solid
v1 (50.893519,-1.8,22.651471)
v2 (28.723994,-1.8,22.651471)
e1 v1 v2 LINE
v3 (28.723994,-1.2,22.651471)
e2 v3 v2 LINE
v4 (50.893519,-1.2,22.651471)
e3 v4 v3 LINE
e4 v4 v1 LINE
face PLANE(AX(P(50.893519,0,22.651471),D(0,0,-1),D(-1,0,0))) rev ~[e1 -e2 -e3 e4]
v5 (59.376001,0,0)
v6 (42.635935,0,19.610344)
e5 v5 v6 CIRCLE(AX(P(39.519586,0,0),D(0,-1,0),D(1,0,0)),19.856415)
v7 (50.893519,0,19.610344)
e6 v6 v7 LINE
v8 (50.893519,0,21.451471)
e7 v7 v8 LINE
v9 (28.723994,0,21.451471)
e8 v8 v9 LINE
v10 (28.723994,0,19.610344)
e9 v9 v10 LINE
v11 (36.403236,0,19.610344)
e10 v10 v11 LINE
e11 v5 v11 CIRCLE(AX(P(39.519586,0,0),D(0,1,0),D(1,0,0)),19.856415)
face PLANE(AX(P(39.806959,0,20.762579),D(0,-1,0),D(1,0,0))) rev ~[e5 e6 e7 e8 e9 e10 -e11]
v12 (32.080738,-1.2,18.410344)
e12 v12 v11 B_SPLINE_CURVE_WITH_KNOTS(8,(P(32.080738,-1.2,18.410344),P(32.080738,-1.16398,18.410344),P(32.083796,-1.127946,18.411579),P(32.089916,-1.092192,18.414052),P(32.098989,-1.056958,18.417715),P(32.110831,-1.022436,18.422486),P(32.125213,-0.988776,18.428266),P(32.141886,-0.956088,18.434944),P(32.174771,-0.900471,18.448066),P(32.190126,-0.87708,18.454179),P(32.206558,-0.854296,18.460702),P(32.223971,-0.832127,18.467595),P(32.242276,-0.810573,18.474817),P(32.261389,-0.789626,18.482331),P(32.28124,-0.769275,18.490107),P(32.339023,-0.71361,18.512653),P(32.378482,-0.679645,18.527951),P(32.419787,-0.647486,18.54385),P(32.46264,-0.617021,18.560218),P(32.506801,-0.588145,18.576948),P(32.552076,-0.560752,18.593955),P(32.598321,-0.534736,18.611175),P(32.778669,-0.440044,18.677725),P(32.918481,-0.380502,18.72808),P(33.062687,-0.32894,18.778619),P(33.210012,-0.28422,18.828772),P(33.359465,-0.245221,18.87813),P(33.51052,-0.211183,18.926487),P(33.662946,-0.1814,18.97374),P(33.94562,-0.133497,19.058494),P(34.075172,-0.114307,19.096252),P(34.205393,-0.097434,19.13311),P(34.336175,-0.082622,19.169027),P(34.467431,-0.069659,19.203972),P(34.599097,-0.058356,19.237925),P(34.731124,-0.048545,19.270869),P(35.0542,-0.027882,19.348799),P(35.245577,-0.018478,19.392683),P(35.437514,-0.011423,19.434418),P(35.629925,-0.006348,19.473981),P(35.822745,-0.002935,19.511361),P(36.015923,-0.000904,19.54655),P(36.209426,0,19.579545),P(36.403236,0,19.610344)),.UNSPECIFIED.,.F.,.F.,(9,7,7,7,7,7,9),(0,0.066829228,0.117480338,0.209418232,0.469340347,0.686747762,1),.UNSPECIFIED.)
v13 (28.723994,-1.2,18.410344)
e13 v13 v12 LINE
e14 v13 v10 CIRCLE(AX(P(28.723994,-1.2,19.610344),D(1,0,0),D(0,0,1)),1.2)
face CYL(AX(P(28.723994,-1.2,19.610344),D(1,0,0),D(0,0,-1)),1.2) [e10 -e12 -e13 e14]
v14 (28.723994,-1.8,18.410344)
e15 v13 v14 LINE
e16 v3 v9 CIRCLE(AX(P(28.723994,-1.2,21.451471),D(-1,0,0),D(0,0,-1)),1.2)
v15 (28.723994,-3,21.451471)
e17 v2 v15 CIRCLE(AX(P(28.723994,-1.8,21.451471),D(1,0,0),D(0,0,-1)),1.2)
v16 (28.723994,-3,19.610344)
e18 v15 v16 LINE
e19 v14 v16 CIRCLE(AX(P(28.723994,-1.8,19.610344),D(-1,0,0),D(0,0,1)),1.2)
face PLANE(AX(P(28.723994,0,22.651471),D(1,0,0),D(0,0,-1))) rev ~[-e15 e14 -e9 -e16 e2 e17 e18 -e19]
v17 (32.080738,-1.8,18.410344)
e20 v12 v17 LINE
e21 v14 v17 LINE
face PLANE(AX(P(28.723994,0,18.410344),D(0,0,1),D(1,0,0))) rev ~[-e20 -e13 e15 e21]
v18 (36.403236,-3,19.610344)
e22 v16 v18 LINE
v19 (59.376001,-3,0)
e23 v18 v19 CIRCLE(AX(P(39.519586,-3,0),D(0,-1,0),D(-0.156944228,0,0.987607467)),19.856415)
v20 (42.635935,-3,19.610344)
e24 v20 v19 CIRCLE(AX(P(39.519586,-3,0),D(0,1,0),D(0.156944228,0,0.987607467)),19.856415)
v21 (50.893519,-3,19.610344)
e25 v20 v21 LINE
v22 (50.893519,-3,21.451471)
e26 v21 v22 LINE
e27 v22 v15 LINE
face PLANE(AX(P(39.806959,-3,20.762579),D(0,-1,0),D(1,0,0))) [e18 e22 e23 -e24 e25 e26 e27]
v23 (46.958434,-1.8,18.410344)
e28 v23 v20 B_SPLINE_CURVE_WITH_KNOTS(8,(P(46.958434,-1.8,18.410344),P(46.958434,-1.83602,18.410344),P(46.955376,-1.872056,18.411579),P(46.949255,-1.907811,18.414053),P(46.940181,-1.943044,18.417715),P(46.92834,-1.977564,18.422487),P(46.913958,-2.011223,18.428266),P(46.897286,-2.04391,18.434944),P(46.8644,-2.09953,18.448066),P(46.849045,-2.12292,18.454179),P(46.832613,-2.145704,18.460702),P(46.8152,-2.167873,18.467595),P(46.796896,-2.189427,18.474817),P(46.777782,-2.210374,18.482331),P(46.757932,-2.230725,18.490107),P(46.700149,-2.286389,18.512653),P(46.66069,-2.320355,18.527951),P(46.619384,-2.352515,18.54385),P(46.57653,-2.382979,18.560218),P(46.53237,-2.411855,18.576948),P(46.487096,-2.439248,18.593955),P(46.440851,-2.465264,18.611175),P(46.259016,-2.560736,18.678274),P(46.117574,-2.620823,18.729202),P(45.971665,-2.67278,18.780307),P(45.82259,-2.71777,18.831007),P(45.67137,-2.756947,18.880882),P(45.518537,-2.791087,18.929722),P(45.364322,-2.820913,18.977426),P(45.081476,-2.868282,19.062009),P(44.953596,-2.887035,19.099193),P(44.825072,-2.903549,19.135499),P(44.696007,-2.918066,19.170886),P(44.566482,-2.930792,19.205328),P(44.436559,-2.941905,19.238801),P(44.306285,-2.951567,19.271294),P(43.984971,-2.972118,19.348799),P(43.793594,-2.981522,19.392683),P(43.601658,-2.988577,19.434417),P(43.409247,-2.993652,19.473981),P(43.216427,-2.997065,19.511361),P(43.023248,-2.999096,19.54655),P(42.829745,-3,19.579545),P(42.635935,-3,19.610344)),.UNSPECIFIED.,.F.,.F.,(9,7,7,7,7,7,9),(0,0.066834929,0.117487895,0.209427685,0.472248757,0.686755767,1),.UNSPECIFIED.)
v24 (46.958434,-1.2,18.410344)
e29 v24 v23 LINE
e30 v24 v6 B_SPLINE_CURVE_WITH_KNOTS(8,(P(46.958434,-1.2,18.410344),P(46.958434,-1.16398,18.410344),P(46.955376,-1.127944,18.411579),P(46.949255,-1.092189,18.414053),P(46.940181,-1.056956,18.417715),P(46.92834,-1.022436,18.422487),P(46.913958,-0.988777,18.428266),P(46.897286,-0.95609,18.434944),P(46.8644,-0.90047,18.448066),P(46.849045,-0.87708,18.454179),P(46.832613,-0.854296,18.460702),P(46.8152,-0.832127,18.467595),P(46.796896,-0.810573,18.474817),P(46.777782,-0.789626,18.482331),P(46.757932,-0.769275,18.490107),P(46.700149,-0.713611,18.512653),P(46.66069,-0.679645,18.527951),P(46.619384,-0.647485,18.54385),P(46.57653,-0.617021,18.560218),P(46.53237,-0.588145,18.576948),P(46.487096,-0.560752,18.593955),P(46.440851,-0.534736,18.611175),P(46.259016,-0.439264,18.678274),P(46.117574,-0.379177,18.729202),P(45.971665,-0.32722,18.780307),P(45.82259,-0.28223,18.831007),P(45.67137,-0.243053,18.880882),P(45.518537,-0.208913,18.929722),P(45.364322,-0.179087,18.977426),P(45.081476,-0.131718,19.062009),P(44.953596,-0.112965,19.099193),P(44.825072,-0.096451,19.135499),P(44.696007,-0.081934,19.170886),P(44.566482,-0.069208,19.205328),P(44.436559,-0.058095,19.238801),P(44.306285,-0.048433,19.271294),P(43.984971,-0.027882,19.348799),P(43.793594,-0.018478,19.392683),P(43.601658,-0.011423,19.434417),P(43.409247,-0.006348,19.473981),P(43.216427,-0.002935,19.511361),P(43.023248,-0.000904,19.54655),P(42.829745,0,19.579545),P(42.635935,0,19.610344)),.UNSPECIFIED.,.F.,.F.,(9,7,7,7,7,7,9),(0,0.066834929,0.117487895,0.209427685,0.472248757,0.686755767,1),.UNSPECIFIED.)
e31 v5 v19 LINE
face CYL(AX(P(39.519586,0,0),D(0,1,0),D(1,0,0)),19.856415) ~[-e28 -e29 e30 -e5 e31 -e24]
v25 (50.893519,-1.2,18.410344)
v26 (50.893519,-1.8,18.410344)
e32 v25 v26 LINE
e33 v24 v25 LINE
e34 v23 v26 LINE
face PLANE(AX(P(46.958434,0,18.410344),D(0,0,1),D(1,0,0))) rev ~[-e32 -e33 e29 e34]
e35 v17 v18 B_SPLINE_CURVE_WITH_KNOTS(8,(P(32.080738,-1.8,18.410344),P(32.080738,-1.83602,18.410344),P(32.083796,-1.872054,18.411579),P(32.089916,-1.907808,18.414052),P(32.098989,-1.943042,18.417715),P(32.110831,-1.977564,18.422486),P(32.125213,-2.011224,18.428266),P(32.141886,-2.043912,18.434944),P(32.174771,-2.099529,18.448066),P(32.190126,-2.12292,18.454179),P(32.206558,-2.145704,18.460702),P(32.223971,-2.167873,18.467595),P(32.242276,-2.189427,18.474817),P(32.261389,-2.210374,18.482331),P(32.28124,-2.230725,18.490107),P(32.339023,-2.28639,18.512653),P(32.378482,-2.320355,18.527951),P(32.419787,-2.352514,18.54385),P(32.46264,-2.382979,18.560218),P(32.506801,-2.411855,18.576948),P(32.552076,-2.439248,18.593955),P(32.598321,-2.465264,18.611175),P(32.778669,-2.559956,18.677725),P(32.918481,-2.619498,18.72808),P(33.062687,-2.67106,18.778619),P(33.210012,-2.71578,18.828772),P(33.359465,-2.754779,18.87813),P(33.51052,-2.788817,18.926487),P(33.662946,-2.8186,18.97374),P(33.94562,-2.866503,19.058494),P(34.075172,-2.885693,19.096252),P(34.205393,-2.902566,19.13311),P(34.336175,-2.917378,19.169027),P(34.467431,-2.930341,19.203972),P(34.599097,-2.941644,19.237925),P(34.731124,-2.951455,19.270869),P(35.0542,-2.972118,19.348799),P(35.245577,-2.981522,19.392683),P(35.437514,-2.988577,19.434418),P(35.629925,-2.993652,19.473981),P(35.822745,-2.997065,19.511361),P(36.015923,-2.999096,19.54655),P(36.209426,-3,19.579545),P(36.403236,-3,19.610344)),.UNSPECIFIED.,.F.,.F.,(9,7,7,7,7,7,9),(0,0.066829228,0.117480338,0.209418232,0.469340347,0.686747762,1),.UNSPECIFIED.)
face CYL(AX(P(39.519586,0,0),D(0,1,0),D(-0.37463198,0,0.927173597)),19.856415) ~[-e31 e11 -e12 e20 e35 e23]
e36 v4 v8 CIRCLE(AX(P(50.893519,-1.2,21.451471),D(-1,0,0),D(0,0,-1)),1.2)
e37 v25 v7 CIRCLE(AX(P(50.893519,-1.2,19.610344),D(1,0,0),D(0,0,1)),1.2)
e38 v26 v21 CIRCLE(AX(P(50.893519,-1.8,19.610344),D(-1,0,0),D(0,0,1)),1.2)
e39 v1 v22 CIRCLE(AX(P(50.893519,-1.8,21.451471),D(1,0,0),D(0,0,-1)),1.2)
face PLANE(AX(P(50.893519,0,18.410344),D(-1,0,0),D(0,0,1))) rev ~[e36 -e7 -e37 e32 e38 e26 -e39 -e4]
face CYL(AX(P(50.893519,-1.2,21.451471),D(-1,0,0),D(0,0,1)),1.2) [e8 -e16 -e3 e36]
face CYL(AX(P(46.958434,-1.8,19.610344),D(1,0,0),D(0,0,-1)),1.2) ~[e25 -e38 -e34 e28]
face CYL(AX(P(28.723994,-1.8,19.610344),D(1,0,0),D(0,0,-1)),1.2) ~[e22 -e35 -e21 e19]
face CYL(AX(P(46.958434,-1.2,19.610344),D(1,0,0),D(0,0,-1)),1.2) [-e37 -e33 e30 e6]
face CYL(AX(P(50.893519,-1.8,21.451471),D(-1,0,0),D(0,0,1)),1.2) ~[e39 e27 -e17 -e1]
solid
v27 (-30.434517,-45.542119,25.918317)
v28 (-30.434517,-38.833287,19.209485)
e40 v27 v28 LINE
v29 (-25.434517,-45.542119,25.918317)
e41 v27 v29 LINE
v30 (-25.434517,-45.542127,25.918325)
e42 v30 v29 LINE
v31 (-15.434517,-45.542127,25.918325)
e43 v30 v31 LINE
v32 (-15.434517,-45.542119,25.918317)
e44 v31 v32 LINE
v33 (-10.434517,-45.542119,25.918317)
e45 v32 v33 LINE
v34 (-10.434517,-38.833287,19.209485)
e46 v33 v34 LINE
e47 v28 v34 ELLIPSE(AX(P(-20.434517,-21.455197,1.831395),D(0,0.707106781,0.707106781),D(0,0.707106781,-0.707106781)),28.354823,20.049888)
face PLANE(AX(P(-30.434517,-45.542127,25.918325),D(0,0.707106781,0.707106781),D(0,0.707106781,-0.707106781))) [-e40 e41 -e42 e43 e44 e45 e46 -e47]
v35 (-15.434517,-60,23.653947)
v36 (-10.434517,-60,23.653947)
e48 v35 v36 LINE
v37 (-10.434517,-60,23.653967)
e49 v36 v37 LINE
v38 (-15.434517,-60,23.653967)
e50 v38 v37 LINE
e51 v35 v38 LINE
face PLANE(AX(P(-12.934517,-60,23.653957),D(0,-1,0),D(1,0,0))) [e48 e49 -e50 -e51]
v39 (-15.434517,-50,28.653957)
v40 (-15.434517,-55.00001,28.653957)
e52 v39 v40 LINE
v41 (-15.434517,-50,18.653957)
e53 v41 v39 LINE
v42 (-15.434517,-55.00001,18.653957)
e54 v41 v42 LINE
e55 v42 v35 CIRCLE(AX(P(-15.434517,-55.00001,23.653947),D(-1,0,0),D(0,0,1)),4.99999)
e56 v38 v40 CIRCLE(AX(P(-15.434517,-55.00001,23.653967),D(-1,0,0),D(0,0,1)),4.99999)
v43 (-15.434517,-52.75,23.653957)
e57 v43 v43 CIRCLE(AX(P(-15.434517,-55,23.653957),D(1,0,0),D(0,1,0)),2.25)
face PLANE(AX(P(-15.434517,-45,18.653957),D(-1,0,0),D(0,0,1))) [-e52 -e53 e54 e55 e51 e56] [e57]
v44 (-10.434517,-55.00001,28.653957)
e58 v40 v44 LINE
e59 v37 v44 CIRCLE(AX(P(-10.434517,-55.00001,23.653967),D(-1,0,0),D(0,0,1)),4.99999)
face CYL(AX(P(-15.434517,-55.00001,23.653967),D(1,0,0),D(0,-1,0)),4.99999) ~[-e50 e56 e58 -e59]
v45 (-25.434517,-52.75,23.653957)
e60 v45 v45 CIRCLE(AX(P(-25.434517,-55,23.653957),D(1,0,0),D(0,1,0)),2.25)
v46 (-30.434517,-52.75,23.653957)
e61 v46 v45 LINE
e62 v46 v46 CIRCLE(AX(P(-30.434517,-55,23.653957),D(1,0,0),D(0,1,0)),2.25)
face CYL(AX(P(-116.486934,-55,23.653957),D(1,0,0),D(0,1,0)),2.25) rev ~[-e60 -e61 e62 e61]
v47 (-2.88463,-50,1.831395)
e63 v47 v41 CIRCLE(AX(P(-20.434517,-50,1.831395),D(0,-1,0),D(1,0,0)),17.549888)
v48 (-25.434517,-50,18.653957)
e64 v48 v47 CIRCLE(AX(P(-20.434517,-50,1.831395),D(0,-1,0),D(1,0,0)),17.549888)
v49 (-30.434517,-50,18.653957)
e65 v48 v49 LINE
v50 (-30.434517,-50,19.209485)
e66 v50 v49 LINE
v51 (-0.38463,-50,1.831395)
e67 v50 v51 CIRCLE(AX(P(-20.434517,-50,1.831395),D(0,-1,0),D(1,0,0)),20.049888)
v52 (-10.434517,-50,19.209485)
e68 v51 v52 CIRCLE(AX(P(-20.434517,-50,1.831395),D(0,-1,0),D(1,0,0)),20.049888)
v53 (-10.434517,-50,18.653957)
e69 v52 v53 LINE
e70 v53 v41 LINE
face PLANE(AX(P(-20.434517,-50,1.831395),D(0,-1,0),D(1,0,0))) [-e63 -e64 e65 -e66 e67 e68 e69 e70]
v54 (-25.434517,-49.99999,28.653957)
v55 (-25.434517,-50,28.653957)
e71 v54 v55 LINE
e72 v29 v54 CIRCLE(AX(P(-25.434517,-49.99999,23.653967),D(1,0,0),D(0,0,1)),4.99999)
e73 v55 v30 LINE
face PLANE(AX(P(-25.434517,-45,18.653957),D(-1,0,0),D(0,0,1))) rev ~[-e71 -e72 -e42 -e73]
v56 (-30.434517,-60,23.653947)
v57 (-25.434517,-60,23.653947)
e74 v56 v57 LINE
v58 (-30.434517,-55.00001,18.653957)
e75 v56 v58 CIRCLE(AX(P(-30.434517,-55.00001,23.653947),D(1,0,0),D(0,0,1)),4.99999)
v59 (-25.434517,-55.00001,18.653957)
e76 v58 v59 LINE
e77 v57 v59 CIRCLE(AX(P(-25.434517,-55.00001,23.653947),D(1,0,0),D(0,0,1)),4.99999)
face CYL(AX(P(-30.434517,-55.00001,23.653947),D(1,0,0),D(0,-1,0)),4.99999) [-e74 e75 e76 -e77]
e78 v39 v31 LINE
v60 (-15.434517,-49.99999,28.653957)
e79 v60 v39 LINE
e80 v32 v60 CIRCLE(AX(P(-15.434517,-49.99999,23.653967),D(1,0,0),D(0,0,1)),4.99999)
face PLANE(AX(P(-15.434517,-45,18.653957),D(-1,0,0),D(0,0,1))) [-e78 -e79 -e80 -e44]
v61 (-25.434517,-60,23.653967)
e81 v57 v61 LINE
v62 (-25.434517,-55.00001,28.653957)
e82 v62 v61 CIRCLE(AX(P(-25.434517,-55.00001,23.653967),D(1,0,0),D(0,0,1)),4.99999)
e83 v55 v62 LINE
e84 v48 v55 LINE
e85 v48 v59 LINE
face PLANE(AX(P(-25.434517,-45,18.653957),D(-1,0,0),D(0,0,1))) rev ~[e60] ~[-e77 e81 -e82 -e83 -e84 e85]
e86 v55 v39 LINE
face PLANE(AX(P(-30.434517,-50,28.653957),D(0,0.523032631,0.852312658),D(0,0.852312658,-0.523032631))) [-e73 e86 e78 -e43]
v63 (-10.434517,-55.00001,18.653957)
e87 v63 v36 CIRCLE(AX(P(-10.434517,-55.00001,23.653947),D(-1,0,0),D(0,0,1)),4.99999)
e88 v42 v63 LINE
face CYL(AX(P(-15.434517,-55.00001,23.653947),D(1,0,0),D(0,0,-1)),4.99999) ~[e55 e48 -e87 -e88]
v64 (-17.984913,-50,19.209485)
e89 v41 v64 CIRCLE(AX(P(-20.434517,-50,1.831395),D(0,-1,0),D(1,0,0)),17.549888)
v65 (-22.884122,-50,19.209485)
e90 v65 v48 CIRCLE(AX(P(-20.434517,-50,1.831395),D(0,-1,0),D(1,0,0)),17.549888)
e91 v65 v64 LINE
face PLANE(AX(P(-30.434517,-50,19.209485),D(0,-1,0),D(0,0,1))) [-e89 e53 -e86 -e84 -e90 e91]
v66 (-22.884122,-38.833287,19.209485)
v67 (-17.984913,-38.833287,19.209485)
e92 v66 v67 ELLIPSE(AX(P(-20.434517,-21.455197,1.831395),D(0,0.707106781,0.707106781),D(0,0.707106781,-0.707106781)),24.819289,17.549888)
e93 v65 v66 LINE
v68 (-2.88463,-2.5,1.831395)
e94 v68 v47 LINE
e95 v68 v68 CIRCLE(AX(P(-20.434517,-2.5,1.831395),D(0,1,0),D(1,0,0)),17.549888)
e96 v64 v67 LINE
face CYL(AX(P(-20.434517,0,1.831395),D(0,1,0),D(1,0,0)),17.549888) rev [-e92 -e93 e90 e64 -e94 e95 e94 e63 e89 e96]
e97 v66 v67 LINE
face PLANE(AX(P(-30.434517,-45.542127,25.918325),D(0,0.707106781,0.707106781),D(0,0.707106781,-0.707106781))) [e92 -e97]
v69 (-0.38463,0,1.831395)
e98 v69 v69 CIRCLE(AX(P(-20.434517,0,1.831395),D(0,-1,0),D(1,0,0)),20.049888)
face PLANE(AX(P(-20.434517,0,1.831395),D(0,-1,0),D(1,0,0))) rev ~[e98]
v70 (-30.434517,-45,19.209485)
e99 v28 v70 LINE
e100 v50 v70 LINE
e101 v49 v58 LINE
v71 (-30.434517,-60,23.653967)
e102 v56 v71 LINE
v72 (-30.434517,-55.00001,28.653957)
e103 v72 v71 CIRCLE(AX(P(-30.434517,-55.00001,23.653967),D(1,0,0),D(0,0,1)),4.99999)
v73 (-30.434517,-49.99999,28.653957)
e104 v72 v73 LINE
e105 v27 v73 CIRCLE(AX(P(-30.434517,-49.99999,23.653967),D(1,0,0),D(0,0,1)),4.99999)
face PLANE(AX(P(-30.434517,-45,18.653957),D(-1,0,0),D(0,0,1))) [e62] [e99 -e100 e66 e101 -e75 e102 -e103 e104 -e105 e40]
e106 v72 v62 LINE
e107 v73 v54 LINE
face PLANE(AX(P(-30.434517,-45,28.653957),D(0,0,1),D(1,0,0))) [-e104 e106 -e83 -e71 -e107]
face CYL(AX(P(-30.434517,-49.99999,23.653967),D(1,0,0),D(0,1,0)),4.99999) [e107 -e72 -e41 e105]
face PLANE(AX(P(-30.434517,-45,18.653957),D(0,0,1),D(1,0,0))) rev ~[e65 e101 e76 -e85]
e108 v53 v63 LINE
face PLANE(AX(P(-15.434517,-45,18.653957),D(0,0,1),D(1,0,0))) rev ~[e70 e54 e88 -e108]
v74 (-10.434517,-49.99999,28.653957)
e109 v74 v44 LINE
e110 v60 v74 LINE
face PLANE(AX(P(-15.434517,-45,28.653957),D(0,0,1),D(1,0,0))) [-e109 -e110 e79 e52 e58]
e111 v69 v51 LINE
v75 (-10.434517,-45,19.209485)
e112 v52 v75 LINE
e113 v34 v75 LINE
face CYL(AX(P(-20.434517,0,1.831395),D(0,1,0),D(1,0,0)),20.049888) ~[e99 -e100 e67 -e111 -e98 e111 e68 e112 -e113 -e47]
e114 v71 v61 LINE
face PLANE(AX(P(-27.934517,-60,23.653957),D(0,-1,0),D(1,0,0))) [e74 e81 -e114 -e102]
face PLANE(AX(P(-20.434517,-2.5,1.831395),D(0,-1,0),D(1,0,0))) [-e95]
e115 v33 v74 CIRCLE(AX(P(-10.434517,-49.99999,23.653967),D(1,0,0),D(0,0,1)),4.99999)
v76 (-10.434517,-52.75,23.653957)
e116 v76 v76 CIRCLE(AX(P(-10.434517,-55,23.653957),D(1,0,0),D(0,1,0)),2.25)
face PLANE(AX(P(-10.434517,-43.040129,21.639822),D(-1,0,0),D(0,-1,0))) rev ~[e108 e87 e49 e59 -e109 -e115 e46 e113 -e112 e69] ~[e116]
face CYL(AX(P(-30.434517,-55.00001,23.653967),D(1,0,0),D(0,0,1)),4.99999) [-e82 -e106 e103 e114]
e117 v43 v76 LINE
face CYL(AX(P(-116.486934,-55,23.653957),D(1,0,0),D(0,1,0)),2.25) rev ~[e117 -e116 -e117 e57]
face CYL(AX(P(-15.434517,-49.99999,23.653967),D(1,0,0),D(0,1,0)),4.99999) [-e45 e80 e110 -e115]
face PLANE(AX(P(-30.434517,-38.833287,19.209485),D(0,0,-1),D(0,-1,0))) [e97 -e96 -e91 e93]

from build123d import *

# Parameters (mm, degrees)
F0_R      = 20.0498878018
F1_DEPTH  = 50
F2_T      = -2.5
F4_W      = 5
F4_H      = 10
F5_DEPTH  = 15
F6_R      = 4.99999
F8_D      = 4.5
F10_DEPTH = 3
F11_R     = 1.2
F13_DEPTH = 20


# Not quite as in the source:
# - a fillet or chamfer is up to 0.001 mm smaller than in the source, because OpenCascade refuses the exact size


with BuildPart() as f1:
    # F0 (on Front) → F1 (new body)
    with BuildSketch(Plane.XZ):
        with Locations((-20.4345174134, 1.8313954351)):
            Circle(F0_R)
    extrude(amount=F1_DEPTH)

    # F2
    f2_openings = [f1.faces().sort_by_distance(p)[0] for p in [
        (-20.434517, -50, 1.831395),
    ]]
    offset(amount=F2_T, openings=f2_openings)

    # F4 (on offset) → F5 (join)
    with BuildSketch(Plane.XZ.offset(45)):
        with Locations((-27.9345174134, 23.653956532)):
            Rectangle(F4_W, F4_H)
        with Locations((-12.9345174134, 23.653956532)):
            Rectangle(F4_W, F4_H)
    extrude(amount=F5_DEPTH)

    # F6 (radius 5 in the source; OpenCascade refuses exactly that, so slightly less here)
    f6_edges = [f1.edges().sort_by_distance(p)[0] for p in [
        (-12.934517, -45, 28.653957),
        (-27.934517, -45, 28.653957),
        (-27.934517, -60, 18.653957),
        (-12.934517, -60, 18.653957),
        (-12.934517, -60, 28.653957),
        (-27.934517, -60, 28.653957),
    ]]
    fillet(f6_edges, radius=F6_R)

    # F8 (through all)
    with Locations(Plane(origin=(-30.4345174134, 0, 0), x_dir=(0, -1, 0), z_dir=(-1, 0, 0))):
        with Locations((55, 23.653956532)):
            Hole(F8_D / 2)

    # F12 (on face) → F13 (join, through all)
    with BuildSketch(Plane(origin=(-30.4345174134, 0, 0), x_dir=(0, -1, 0), z_dir=(-1, 0, 0))):
        Polygon((38.8332865942, 19.2094851134), (45, 19.2094851134), (45.5421266796, 25.9183251988), align=None)
        Polygon((45.5421266796, 25.9183251988), (45, 19.2094851134), (50, 19.2094851134), (50, 28.653956532), align=None)
    extrude(amount=-F13_DEPTH)


with BuildPart() as f10:
    # F9 (on Front) → F10 (new body)
    with BuildSketch(Plane.XZ):
        with BuildLine():
            ThreePointArc((32.0807376184, 18.4103436768), (39.519585669, 19.8564149488), (46.9584337196, 18.4103436768))
            Line((46.9584337196, 18.4103436768), (50.8935190737, 18.4103436768))
            Line((50.8935190737, 18.4103436768), (50.8935190737, 22.6514711976))
            Line((50.8935190737, 22.6514711976), (28.72399427, 22.6514711976))
            Line((28.72399427, 22.6514711976), (28.72399427, 18.4103436768))
            Line((28.72399427, 18.4103436768), (32.0807376184, 18.4103436768))
        make_face()
        with BuildLine():
            ThreePointArc((32.0807376184, 18.4103436768), (28.4162447082, -16.4618660584), (59.3760006178, 0))
            ThreePointArc((59.3760006178, 0), (55.9814517275, 11.1033409608), (46.9584337196, 18.4103436768))
            Line((46.9584337196, 18.4103436768), (32.0807376184, 18.4103436768))
        make_face()
        with BuildLine():
            Line((32.0807376184, 18.4103436768), (46.9584337196, 18.4103436768))
            ThreePointArc((46.9584337196, 18.4103436768), (39.519585669, 19.8564149488), (32.0807376184, 18.4103436768))
        make_face()
    extrude(amount=F10_DEPTH)

    # F11
    f11_edges = [f10.edges().sort_by_distance(p)[0] for p in [
        (39.808757, 0, 22.651471),
        (39.808757, -3, 22.651471),
        (30.402366, 0, 18.410344),
        (48.925976, 0, 18.410344),
        (48.925976, -3, 18.410344),
        (30.402366, -3, 18.410344),
    ]]
    fillet(f11_edges, radius=F11_R)


solid = Compound([f1.part, f10.part])
